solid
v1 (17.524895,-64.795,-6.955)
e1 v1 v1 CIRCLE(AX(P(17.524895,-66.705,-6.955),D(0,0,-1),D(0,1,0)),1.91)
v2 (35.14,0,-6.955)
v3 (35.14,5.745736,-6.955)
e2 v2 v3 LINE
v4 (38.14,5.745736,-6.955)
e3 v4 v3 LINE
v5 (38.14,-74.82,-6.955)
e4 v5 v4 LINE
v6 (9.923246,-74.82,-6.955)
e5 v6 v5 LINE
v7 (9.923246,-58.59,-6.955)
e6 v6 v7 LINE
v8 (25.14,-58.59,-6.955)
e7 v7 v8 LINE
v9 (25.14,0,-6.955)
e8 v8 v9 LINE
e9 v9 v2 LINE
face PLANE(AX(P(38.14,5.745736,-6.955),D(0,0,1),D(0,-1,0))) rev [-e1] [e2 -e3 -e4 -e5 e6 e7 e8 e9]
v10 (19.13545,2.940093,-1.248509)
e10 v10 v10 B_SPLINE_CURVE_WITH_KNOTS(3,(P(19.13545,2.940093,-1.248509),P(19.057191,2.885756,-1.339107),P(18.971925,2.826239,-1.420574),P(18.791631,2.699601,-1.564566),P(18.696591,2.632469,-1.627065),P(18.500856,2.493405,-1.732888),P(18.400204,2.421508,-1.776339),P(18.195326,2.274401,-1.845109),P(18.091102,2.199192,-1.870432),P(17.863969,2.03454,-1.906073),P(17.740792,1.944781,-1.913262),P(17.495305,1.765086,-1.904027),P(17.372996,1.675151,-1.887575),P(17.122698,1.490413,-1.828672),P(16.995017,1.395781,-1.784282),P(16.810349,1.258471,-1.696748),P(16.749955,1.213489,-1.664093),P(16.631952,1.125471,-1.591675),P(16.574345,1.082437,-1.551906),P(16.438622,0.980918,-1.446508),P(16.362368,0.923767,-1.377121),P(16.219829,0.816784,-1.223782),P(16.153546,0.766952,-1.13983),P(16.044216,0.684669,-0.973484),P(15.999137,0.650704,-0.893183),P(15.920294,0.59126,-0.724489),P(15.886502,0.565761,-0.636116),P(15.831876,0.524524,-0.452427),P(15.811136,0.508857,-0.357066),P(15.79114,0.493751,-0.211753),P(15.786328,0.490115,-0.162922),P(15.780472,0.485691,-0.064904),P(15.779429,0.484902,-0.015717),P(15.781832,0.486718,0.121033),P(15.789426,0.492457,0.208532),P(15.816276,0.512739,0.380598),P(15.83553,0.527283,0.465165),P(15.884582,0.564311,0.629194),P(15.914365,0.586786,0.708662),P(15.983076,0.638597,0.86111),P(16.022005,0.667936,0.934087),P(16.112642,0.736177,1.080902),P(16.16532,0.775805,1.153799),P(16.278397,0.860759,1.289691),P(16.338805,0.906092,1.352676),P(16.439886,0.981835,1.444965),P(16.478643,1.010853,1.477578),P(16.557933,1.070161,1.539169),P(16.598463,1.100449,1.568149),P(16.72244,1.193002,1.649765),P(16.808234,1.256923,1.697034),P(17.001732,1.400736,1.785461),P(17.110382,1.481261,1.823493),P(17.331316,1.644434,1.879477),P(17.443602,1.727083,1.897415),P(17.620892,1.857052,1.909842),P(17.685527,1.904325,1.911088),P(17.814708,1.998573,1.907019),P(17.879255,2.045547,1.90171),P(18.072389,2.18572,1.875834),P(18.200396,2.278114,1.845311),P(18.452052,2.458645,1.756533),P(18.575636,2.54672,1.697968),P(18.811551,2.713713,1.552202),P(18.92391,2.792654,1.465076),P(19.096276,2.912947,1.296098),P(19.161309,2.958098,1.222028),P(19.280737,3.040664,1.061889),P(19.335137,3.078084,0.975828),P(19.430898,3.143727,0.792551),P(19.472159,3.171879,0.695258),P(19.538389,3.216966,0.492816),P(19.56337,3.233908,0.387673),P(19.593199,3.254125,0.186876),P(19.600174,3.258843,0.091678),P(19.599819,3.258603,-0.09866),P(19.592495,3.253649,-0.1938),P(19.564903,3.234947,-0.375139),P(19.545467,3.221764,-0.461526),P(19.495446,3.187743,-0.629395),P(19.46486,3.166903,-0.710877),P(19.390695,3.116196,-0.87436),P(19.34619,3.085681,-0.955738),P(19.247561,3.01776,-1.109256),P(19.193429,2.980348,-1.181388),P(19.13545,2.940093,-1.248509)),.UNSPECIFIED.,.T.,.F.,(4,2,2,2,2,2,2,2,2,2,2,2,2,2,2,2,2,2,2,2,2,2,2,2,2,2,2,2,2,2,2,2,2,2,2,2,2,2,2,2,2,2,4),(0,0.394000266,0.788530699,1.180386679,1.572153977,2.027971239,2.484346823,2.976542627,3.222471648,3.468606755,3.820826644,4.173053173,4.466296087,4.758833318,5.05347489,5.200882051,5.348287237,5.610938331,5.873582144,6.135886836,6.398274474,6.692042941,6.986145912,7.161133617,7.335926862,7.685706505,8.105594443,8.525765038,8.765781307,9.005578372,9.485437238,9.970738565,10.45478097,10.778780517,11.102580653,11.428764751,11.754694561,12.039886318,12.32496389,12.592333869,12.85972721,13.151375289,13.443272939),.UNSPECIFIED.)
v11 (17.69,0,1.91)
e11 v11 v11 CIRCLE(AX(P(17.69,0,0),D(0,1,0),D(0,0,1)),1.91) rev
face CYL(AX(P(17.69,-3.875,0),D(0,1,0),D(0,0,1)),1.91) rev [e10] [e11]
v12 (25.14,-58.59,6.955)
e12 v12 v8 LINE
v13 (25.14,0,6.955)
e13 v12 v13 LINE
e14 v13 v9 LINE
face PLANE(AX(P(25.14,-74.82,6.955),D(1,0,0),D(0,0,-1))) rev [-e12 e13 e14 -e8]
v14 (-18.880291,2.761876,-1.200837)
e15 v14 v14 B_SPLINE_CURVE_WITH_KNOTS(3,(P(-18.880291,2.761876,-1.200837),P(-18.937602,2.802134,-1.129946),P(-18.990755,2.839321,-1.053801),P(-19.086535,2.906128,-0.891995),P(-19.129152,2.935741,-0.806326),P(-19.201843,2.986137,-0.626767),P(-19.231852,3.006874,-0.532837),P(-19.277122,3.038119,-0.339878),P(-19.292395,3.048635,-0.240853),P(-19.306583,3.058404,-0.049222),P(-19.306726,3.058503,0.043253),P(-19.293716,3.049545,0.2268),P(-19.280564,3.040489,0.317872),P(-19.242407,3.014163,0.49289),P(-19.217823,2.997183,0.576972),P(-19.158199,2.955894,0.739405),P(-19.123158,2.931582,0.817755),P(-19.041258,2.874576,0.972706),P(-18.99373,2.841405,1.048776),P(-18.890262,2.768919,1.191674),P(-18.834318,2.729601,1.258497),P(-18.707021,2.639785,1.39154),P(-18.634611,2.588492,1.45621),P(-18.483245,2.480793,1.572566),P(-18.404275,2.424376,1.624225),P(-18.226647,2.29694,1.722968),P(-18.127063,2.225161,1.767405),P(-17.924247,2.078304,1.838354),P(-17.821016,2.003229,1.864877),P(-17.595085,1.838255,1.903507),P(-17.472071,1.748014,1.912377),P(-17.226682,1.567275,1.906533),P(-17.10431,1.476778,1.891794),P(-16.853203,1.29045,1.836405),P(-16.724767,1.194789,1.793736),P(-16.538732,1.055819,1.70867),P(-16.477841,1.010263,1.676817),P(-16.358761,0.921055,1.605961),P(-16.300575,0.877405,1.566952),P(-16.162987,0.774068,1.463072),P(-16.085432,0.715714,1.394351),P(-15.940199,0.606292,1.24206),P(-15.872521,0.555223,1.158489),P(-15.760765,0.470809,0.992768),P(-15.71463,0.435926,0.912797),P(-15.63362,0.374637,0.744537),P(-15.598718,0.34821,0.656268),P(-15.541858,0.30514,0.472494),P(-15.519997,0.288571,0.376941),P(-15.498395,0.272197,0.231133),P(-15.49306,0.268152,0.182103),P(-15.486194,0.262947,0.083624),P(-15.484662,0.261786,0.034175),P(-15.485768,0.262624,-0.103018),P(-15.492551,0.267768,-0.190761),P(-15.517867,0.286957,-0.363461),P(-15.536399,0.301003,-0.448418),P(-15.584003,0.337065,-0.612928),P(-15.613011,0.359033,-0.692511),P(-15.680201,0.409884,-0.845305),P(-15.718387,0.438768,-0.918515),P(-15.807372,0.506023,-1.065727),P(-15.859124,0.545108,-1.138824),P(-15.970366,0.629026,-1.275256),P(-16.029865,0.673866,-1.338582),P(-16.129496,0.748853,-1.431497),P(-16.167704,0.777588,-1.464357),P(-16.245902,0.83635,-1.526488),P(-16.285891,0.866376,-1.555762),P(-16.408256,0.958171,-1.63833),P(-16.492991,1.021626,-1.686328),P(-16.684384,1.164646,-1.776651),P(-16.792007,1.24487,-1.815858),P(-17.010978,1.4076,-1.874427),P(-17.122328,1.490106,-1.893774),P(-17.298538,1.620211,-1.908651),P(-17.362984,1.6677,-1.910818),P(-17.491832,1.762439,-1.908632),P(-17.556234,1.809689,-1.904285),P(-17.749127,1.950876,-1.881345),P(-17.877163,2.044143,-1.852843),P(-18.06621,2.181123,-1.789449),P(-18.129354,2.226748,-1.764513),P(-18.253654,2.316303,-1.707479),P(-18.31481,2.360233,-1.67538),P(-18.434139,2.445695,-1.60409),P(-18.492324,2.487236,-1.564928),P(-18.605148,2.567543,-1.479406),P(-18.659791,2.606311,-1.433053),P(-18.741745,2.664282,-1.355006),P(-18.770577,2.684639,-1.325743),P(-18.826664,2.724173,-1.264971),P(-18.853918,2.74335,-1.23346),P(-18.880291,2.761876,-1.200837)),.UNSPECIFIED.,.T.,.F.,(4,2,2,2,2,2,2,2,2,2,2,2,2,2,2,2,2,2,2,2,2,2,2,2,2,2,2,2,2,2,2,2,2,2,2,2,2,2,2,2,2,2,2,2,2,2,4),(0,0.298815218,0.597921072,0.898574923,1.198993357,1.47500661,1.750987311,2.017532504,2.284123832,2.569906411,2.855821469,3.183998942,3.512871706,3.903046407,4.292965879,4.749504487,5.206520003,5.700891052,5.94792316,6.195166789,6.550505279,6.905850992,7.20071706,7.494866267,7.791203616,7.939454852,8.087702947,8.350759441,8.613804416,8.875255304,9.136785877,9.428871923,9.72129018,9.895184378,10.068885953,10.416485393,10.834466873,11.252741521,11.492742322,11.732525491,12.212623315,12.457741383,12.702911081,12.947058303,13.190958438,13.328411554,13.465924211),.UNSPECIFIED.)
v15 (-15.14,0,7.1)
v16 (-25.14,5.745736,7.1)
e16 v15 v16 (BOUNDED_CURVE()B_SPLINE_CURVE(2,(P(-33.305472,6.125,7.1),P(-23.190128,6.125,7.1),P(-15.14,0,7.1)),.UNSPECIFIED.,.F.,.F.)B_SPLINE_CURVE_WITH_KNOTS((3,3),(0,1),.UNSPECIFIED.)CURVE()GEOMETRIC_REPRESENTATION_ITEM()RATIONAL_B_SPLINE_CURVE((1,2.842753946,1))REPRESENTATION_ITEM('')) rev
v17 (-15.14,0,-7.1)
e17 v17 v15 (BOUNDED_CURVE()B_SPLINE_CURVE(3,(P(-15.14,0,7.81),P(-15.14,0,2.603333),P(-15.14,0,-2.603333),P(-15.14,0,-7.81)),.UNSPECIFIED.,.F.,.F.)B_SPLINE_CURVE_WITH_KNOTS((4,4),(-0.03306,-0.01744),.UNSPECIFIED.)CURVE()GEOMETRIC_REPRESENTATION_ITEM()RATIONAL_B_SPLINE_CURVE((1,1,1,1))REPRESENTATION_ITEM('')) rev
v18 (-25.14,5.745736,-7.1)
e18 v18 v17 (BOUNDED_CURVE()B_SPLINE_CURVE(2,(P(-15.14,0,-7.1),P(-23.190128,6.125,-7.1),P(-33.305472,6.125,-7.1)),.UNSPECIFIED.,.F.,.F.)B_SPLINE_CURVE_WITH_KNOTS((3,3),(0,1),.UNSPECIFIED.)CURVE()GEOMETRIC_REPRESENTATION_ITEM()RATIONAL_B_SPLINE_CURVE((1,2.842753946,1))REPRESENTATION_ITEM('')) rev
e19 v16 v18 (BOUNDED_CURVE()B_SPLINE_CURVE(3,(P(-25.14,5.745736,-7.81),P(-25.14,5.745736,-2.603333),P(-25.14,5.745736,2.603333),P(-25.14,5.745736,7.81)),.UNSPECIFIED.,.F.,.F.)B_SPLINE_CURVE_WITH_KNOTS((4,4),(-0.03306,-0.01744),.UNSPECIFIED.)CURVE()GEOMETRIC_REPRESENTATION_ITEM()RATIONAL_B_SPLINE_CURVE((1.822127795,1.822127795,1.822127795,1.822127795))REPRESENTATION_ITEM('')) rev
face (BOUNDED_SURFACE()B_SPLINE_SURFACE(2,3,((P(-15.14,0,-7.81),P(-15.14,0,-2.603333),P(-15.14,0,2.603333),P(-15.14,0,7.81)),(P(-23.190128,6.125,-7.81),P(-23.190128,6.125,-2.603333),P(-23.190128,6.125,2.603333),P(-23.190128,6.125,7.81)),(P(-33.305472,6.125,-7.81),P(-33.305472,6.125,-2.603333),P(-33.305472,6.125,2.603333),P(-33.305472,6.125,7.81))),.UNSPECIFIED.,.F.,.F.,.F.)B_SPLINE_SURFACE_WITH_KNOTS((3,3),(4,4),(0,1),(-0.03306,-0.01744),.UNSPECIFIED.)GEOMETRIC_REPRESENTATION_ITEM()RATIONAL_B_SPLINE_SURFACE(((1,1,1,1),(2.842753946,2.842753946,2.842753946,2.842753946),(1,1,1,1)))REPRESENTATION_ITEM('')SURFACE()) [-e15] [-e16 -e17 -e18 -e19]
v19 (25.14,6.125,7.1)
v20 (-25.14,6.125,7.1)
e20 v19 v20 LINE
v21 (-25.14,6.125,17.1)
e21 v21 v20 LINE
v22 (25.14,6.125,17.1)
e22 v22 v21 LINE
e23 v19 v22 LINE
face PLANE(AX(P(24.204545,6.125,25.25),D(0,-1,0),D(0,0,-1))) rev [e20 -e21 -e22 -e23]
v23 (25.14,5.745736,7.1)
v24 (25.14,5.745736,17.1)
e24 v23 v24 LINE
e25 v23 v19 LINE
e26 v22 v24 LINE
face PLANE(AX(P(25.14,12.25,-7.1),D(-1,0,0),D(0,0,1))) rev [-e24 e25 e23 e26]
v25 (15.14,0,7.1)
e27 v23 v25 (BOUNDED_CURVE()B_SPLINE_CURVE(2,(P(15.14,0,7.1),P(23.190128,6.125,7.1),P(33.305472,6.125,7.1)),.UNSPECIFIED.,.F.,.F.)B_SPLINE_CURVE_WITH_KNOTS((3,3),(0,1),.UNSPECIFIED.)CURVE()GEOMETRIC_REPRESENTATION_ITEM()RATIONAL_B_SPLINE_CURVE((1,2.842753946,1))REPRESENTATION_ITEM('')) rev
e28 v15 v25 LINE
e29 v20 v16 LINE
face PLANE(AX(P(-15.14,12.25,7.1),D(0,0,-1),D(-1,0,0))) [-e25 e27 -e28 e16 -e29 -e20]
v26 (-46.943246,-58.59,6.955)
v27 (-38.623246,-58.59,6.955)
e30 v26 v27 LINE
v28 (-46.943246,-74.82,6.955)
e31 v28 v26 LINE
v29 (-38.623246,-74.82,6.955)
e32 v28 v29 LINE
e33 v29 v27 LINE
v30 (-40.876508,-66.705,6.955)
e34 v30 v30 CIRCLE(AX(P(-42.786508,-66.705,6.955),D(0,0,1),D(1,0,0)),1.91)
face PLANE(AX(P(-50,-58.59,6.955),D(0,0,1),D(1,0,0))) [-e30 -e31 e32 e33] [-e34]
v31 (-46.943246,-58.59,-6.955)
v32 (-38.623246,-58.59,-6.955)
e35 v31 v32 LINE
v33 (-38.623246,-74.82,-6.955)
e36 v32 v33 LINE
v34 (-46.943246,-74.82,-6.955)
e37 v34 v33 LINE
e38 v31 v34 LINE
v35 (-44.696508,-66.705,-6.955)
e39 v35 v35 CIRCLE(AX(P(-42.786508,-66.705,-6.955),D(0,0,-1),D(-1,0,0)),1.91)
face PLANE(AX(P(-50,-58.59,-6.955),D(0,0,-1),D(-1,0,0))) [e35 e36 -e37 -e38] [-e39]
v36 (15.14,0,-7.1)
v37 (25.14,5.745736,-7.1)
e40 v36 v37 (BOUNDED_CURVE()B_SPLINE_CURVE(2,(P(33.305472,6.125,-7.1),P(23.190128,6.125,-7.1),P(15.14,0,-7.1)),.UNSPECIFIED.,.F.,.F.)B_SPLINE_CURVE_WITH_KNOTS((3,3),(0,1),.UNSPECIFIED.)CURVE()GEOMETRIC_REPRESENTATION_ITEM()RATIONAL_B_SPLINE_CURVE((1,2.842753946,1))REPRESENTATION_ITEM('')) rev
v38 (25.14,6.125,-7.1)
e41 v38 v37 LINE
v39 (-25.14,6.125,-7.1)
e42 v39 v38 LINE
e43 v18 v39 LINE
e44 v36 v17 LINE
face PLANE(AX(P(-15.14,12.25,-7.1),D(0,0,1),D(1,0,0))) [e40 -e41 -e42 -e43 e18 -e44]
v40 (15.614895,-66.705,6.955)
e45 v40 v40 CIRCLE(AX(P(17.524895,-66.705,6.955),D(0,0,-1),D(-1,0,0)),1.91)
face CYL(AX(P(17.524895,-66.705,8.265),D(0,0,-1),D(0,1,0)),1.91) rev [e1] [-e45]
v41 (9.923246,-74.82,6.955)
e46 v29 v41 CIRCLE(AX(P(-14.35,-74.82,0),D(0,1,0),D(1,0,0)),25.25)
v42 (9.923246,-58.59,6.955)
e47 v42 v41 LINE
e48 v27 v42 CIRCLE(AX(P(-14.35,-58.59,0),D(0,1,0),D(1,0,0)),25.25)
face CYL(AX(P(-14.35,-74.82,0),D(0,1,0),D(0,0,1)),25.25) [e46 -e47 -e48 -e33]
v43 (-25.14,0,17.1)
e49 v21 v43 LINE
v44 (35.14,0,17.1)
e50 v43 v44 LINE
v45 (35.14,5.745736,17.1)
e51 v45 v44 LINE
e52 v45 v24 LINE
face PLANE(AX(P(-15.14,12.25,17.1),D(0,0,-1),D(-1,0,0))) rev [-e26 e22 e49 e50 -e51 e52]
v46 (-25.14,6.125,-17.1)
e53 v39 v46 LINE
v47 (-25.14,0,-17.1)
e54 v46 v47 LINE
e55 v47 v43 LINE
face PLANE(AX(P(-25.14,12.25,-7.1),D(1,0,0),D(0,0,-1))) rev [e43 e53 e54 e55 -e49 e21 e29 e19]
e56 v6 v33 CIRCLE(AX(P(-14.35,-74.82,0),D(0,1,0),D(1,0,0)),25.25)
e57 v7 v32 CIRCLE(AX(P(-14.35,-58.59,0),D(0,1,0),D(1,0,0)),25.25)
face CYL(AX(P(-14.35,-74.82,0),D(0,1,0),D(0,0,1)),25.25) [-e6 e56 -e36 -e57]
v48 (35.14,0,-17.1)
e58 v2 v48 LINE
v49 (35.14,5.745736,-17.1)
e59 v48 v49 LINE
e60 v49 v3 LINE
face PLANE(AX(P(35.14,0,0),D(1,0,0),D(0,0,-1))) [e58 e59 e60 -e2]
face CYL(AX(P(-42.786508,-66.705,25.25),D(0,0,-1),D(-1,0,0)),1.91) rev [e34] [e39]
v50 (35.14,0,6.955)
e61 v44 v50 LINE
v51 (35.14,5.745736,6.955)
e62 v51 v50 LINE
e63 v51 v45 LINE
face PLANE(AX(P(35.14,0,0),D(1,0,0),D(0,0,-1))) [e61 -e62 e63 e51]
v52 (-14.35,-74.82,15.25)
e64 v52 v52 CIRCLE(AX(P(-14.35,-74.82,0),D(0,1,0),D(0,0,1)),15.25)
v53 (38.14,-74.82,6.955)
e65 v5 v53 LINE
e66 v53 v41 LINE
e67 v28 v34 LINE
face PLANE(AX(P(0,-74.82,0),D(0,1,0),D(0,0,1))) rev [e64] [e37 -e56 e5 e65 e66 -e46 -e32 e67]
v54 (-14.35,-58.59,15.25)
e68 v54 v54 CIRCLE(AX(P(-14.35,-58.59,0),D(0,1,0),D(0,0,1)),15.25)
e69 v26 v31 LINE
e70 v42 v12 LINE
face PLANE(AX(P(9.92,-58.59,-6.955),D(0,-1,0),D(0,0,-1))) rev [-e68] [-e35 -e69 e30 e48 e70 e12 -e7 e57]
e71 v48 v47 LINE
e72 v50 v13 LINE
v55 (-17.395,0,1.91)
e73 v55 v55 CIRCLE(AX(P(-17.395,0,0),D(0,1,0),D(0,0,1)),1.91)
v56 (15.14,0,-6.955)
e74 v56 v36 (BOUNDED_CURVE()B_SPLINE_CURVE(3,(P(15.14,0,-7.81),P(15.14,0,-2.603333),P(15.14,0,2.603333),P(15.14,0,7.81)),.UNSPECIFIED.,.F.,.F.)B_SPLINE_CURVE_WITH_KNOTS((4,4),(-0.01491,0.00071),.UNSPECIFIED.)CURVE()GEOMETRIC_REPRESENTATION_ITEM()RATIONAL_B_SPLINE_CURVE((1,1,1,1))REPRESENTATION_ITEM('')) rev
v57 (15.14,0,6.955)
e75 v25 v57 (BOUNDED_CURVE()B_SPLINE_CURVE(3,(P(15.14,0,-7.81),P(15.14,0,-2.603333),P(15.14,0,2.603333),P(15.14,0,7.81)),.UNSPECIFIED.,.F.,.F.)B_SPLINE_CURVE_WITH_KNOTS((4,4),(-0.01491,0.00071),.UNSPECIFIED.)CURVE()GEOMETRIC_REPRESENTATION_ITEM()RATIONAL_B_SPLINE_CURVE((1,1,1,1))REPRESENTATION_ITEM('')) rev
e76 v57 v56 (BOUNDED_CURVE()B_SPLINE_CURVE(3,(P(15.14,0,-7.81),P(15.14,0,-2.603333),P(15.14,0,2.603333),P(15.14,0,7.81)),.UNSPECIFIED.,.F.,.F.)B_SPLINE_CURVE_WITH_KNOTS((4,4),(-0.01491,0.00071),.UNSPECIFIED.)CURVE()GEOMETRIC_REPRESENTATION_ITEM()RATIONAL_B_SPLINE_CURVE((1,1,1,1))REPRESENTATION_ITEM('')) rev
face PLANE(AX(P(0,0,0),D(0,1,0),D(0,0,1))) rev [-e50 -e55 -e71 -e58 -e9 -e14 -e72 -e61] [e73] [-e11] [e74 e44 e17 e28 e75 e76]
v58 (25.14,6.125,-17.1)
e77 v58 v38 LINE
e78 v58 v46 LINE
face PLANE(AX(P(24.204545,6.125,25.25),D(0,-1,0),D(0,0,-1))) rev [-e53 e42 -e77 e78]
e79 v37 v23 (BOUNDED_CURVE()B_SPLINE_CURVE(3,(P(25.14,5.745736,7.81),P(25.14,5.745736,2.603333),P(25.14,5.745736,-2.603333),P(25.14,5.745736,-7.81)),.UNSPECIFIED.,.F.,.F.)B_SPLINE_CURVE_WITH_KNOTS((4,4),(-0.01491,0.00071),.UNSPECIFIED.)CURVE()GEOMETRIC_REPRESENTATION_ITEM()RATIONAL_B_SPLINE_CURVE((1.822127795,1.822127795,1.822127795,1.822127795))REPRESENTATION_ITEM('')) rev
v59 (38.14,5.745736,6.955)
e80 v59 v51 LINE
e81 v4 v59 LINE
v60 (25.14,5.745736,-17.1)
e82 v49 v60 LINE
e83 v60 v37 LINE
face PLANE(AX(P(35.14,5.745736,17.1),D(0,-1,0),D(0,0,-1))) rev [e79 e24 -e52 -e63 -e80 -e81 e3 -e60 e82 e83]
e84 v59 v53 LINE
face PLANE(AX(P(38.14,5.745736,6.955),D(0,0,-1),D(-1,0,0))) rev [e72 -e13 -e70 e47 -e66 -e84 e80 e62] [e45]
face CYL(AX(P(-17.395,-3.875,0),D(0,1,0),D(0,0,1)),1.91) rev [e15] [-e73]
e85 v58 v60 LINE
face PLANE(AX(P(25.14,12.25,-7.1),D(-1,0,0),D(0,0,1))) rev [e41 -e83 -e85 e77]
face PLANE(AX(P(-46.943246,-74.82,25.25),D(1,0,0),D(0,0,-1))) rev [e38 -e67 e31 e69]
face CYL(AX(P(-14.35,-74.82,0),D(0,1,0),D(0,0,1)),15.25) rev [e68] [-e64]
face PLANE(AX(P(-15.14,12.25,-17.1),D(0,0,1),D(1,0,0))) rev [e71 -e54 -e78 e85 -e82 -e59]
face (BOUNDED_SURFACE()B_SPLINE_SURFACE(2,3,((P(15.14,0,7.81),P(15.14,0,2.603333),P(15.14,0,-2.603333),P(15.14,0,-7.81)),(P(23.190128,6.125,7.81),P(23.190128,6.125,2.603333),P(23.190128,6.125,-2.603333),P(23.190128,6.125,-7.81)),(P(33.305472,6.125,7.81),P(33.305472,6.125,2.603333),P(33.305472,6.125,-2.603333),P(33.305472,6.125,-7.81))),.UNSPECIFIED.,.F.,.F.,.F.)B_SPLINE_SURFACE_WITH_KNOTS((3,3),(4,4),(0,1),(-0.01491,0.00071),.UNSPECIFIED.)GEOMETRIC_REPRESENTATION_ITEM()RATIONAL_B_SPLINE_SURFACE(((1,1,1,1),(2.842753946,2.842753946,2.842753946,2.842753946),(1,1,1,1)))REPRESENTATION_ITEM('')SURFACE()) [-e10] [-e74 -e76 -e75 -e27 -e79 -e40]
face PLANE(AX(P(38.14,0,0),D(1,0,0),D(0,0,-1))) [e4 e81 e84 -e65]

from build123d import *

# Parameters (mm, degrees)
SKETCH_1_W                = 50.28
SKETCH_1_H                = 34.2
SKETCH_1_W_2              = 30.28
SKETCH_1_H_2              = 14.2
EXTRUDE_1_DEPTH           = 12.25
SKETCH_4_W                = 13
SKETCH_4_H                = 13.91
EXTRUDE_1_2_DEPTH         = 74.82
SKETCH_5_W                = 13.91
SKETCH_5_H                = 16.23
EXTRUDE_2_DEPTH           = 16
SKETCH_7_R                = 25.25
SKETCH_7_R_2              = 15.25
EXTRUDE_2_2_DEPTH         = 16.23
SKETCH_15_R               = 1.91
CUT_EXTRUDE_6_DEPTH       = 97.964478439
SKETCH_18_W               = 49.344544624
SKETCH_18_H               = 6.125
CUT_EXTRUDE_8_DEPTH       = 101.789238284
SKETCH_19_W               = 34.2
SKETCH_19_H               = 6.125
CUT_EXTRUDE_9_DEPTH       = 10
SKETCH_21_R               = 1.91
CUT_EXTRUDE_10_DEPTH      = 10
SKETCH_20_R               = 1.91
CUT_EXTRUDE_11_DEPTH      = 10
FILLET_START              = -7.1
FILLET_1_DEPTH            = 14.2
FILLET_2_DEPTH            = 14.2
SKETCH_29_W               = 13.91
SKETCH_29_H               = 74.82
EXTRUDE_5_DEPTH           = 10
SKETCH_30_W               = 10
SKETCH_30_H               = 58.59
CUT_EXTRUDE_13_DEPTH      = 97.964478439
SKETCH_32_W               = 34.2
SKETCH_32_H               = 5.745736365
EXTRUDE_6_DEPTH           = 10
CUT_EXTRUDE_16_DEPTH      = 50
CUT_EXTRUDE_16_DEPTH_BACK = 50
SKETCH_38_W               = 116.985630298
SKETCH_38_H               = 80.538350638
SKETCH_41_W               = 13.91
SKETCH_41_H               = 5.745736365
EXTRUDE_7_DEPTH           = 3
SKETCH_42_W               = 13
SKETCH_42_H               = 13.91
EXTRUDE_8_DEPTH           = 74.82
SKETCH_43_W               = 13.91
SKETCH_43_H               = 16.23
EXTRUDE_9_DEPTH           = 15.22
SKETCH_44_R               = 1.91
CUT_EXTRUDE_17_DEPTH      = 15.22
SKETCH_46_R               = 25.25
SKETCH_46_R_2             = 15.25
EXTRUDE_6_2_DEPTH         = 16.23
EXTRUDE_10_DEPTH          = 7.22
EXTRUDE_10_DEPTH_BACK     = 10
SKETCH_47_W               = 13.91
SKETCH_47_H               = 16.23
SKETCH_50_W               = 3.056753925
SKETCH_50_H               = 16.23
CUT_EXTRUDE_18_DEPTH      = 96.578211037
SKETCH_51_R               = 1.91
CUT_EXTRUDE_19_DEPTH      = 95.015226304


with BuildPart() as part:
    # 草圖1 → Extrude 1 (new body)
    with BuildSketch(Plane(origin=(0, 0, 0), x_dir=(1, 0, 0), z_dir=(0, 1, 0))):
        Rectangle(SKETCH_1_W, SKETCH_1_H)
        Rectangle(SKETCH_1_W_2, SKETCH_1_H_2, mode=Mode.SUBTRACT)
    extrude(amount=EXTRUDE_1_DEPTH)

    # 草圖4 → Extrude 1 2 (add)
    with BuildSketch(Plane.XZ):
        with Locations((18.64, 0)):
            Rectangle(SKETCH_4_W, SKETCH_4_H)
    extrude(amount=EXTRUDE_1_2_DEPTH)

    # 草圖5 → Extrude 2 (add)
    with BuildSketch(Plane.ZY.offset(-12.14)):
        with Locations((0, -66.705)):
            Rectangle(SKETCH_5_W, SKETCH_5_H)
    extrude(amount=EXTRUDE_2_DEPTH)

    # 草圖7 → Extrude 2 2 (add)
    with BuildSketch(Plane(origin=(3.626674765, -74.82, 0), x_dir=(1, 0, 0), z_dir=(0, -1, 0))):
        with Locations((-30.978154344, 0)):
            Circle(SKETCH_7_R)
        with Locations((-30.978154344, 0)):
            Circle(SKETCH_7_R_2, mode=Mode.SUBTRACT)
    extrude(amount=-EXTRUDE_2_2_DEPTH)

    # 草圖15 → 除料-伸長6 (cut, through all)
    with BuildSketch(Plane(origin=(0, 0, -6.955), x_dir=(-1, 0, 0), z_dir=(0, 0, -1))):
        with Locations((-4.530883248, -66.705)):
            Circle(SKETCH_15_R)
    extrude(amount=-CUT_EXTRUDE_6_DEPTH, mode=Mode.SUBTRACT)

    # 草圖18 → 除料-伸長8 (cut, through all)
    with BuildSketch(Plane(origin=(0, 0, -17.1), x_dir=(-1, 0, 0), z_dir=(0, 0, -1))):
        with Locations((0.467727688, 9.1875)):
            Rectangle(SKETCH_18_W, SKETCH_18_H)
    extrude(amount=-CUT_EXTRUDE_8_DEPTH, mode=Mode.SUBTRACT)

    # 草圖19 → 除料-伸長9 (cut)
    with BuildSketch(Plane.ZY.offset(-24.204544624)):
        with Locations((0, 9.1875)):
            Rectangle(SKETCH_19_W, SKETCH_19_H)
    extrude(amount=-CUT_EXTRUDE_9_DEPTH, mode=Mode.SUBTRACT)

    # 草圖21 → 除料-伸長10 (cut)
    with BuildSketch(Plane(origin=(0, 6.125, 0), x_dir=(1, 0, 0), z_dir=(0, 1, 0))):
        with Locations(Location((17.69, 0, 0), (0, 0, 270))):
            Circle(SKETCH_21_R)
    extrude(amount=-CUT_EXTRUDE_10_DEPTH, mode=Mode.SUBTRACT)

    # 草圖20 → 除料-伸長11 (cut)
    with BuildSketch(Plane(origin=(0, 6.125, 0), x_dir=(1, 0, 0), z_dir=(0, 1, 0))):
        with Locations(Location((-17.395, 0, 0), (0, 0, 270))):
            Circle(SKETCH_20_R)
    extrude(amount=-CUT_EXTRUDE_11_DEPTH, mode=Mode.SUBTRACT)

    # 圓角1: read off the stored shape, not the designer's step
    # 圓角1 outline → 圓角1 (cut)
    with BuildSketch(Plane.XY.offset(FILLET_START)):
        with BuildLine():
            add(Edge.make_bspline(
                [(-15.14, 0), (-21.974170252, 5.199829476), (-25.14, 5.745736365)],
                knots=[0, 0, 0, 0.664102345, 0.664102345, 0.664102345], degree=2, weights=[1, 2.223777218, 1.822127795]))
            Line((-15.14, 0), (-15.14, 6.125))
            Line((-15.14, 6.125), (-25.14, 6.125))
            Line((-25.14, 6.125), (-25.14, 5.745736365))
        make_face()
    extrude(amount=FILLET_1_DEPTH, mode=Mode.SUBTRACT)

    # 圓角2: read off the stored shape, not the designer's step
    # 圓角2 outline → 圓角2 (cut)
    with BuildSketch(Plane.XY.offset(FILLET_START)):
        with BuildLine():
            Line((15.14, 6.125), (15.14, 0))
            add(Edge.make_bspline(
                [(15.14, 0), (21.974170252, 5.199829476), (25.14, 5.745736365)],
                knots=[0, 0, 0, 0.664102345, 0.664102345, 0.664102345], degree=2, weights=[1, 2.223777218, 1.822127795]))
            Line((25.14, 5.745736365), (25.14, 6.125))
            Line((25.14, 6.125), (15.14, 6.125))
        make_face()
    extrude(amount=FILLET_2_DEPTH, mode=Mode.SUBTRACT)

    # 草圖29 → 填料-伸長5 (add)
    with BuildSketch(Plane(origin=(25.14, 0, 0), x_dir=(0, 0, -1), z_dir=(1, 0, 0))):
        with Locations((0, -37.41)):
            Rectangle(SKETCH_29_W, SKETCH_29_H)
    extrude(amount=EXTRUDE_5_DEPTH)

    # 草圖30 → 除料-伸長13 (cut, through all)
    with BuildSketch(Plane.XY.offset(6.955)):
        with Locations((17.14, -29.295)):
            Rectangle(SKETCH_30_W, SKETCH_30_H)
    extrude(amount=-CUT_EXTRUDE_13_DEPTH, mode=Mode.SUBTRACT)

    # 草圖32 → Extrude 6 (add)
    with BuildSketch(Plane(origin=(25.14, 0, 0), x_dir=(0, 0, -1), z_dir=(1, 0, 0))):
        with Locations((0, 2.872868182)):
            Rectangle(SKETCH_32_W, SKETCH_32_H)
    extrude(amount=EXTRUDE_6_DEPTH)

    # 草圖38 → 除料-伸長16 (cut, two sides: drawn at the far end of the back side and taken through both)
    with BuildSketch(Plane(origin=(0, 0, -6.955), x_dir=(-1, 0, 0), z_dir=(0, 0, -1)).offset(-CUT_EXTRUDE_16_DEPTH_BACK)):
        with Locations((7.268869252, -40.269175319)):
            Rectangle(SKETCH_38_W, SKETCH_38_H)
    extrude(amount=CUT_EXTRUDE_16_DEPTH + CUT_EXTRUDE_16_DEPTH_BACK, mode=Mode.SUBTRACT)

    # 草圖41 → 填料-伸長7 (add)
    with BuildSketch(Plane(origin=(35.14, 0, 0), x_dir=(0, 0, -1), z_dir=(1, 0, 0))):
        with Locations((0, 2.872868182)):
            Rectangle(SKETCH_41_W, SKETCH_41_H)
    extrude(amount=EXTRUDE_7_DEPTH)

    # 草圖42 → 填料-伸長8 (add)
    with BuildSketch(Plane(origin=(0, 0, 0), x_dir=(-1, 0, 0), z_dir=(0, -1, 0))):
        with Locations((-31.64, 0)):
            Rectangle(SKETCH_42_W, SKETCH_42_H)
    extrude(amount=EXTRUDE_8_DEPTH)

    # 草圖43 → 填料-伸長9 (add)
    with BuildSketch(Plane.ZY.offset(-25.14)):
        with Locations((0, -66.705)):
            Rectangle(SKETCH_43_W, SKETCH_43_H)
    extrude(amount=EXTRUDE_9_DEPTH)

    # 草圖44 → 除料-伸長17 (cut)
    with BuildSketch(Plane(origin=(0, 0, -6.955), x_dir=(-1, 0, 0), z_dir=(0, 0, -1))):
        with Locations(Location((-17.524895264, -66.705, 0), (0, 0, 90))):
            Circle(SKETCH_44_R)
    extrude(amount=-CUT_EXTRUDE_17_DEPTH, mode=Mode.SUBTRACT)

    # 草圖46 → Extrude 6 2 (add)
    with BuildSketch(Plane(origin=(0, -58.59, 0), x_dir=(1, 0, 0), z_dir=(0, 1, 0))):
        with Locations((-14.35, 0)):
            Circle(SKETCH_46_R)
        with Locations((-14.35, 0)):
            Circle(SKETCH_46_R_2, mode=Mode.SUBTRACT)
    extrude(amount=-EXTRUDE_6_2_DEPTH)

    # 草圖47 → 填料-伸長10 (add, two sides: drawn at the far end of the back side and taken through both)
    with BuildSketch(Plane(origin=(-40, 0, 0), x_dir=(0, 0, -1), z_dir=(1, 0, 0)).offset(-EXTRUDE_10_DEPTH_BACK)):
        with Locations((0, -66.705)):
            Rectangle(SKETCH_47_W, SKETCH_47_H)
    extrude(amount=EXTRUDE_10_DEPTH + EXTRUDE_10_DEPTH_BACK)

    # 草圖50 → 除料-伸長18 (cut, through all)
    with BuildSketch(Plane(origin=(0, 0, -6.955), x_dir=(-1, 0, 0), z_dir=(0, 0, -1))):
        with Locations((48.471623038, -66.705)):
            Rectangle(SKETCH_50_W, SKETCH_50_H)
    extrude(amount=-CUT_EXTRUDE_18_DEPTH, mode=Mode.SUBTRACT)

    # 草圖51 → 除料-伸長19 (cut, through all)
    with BuildSketch(Plane(origin=(0, 0, -6.955), x_dir=(-1, 0, 0), z_dir=(0, 0, -1))):
        with Locations((42.786508152, -66.705)):
            Circle(SKETCH_51_R)
    extrude(amount=-CUT_EXTRUDE_19_DEPTH, mode=Mode.SUBTRACT)


solid = part.part
